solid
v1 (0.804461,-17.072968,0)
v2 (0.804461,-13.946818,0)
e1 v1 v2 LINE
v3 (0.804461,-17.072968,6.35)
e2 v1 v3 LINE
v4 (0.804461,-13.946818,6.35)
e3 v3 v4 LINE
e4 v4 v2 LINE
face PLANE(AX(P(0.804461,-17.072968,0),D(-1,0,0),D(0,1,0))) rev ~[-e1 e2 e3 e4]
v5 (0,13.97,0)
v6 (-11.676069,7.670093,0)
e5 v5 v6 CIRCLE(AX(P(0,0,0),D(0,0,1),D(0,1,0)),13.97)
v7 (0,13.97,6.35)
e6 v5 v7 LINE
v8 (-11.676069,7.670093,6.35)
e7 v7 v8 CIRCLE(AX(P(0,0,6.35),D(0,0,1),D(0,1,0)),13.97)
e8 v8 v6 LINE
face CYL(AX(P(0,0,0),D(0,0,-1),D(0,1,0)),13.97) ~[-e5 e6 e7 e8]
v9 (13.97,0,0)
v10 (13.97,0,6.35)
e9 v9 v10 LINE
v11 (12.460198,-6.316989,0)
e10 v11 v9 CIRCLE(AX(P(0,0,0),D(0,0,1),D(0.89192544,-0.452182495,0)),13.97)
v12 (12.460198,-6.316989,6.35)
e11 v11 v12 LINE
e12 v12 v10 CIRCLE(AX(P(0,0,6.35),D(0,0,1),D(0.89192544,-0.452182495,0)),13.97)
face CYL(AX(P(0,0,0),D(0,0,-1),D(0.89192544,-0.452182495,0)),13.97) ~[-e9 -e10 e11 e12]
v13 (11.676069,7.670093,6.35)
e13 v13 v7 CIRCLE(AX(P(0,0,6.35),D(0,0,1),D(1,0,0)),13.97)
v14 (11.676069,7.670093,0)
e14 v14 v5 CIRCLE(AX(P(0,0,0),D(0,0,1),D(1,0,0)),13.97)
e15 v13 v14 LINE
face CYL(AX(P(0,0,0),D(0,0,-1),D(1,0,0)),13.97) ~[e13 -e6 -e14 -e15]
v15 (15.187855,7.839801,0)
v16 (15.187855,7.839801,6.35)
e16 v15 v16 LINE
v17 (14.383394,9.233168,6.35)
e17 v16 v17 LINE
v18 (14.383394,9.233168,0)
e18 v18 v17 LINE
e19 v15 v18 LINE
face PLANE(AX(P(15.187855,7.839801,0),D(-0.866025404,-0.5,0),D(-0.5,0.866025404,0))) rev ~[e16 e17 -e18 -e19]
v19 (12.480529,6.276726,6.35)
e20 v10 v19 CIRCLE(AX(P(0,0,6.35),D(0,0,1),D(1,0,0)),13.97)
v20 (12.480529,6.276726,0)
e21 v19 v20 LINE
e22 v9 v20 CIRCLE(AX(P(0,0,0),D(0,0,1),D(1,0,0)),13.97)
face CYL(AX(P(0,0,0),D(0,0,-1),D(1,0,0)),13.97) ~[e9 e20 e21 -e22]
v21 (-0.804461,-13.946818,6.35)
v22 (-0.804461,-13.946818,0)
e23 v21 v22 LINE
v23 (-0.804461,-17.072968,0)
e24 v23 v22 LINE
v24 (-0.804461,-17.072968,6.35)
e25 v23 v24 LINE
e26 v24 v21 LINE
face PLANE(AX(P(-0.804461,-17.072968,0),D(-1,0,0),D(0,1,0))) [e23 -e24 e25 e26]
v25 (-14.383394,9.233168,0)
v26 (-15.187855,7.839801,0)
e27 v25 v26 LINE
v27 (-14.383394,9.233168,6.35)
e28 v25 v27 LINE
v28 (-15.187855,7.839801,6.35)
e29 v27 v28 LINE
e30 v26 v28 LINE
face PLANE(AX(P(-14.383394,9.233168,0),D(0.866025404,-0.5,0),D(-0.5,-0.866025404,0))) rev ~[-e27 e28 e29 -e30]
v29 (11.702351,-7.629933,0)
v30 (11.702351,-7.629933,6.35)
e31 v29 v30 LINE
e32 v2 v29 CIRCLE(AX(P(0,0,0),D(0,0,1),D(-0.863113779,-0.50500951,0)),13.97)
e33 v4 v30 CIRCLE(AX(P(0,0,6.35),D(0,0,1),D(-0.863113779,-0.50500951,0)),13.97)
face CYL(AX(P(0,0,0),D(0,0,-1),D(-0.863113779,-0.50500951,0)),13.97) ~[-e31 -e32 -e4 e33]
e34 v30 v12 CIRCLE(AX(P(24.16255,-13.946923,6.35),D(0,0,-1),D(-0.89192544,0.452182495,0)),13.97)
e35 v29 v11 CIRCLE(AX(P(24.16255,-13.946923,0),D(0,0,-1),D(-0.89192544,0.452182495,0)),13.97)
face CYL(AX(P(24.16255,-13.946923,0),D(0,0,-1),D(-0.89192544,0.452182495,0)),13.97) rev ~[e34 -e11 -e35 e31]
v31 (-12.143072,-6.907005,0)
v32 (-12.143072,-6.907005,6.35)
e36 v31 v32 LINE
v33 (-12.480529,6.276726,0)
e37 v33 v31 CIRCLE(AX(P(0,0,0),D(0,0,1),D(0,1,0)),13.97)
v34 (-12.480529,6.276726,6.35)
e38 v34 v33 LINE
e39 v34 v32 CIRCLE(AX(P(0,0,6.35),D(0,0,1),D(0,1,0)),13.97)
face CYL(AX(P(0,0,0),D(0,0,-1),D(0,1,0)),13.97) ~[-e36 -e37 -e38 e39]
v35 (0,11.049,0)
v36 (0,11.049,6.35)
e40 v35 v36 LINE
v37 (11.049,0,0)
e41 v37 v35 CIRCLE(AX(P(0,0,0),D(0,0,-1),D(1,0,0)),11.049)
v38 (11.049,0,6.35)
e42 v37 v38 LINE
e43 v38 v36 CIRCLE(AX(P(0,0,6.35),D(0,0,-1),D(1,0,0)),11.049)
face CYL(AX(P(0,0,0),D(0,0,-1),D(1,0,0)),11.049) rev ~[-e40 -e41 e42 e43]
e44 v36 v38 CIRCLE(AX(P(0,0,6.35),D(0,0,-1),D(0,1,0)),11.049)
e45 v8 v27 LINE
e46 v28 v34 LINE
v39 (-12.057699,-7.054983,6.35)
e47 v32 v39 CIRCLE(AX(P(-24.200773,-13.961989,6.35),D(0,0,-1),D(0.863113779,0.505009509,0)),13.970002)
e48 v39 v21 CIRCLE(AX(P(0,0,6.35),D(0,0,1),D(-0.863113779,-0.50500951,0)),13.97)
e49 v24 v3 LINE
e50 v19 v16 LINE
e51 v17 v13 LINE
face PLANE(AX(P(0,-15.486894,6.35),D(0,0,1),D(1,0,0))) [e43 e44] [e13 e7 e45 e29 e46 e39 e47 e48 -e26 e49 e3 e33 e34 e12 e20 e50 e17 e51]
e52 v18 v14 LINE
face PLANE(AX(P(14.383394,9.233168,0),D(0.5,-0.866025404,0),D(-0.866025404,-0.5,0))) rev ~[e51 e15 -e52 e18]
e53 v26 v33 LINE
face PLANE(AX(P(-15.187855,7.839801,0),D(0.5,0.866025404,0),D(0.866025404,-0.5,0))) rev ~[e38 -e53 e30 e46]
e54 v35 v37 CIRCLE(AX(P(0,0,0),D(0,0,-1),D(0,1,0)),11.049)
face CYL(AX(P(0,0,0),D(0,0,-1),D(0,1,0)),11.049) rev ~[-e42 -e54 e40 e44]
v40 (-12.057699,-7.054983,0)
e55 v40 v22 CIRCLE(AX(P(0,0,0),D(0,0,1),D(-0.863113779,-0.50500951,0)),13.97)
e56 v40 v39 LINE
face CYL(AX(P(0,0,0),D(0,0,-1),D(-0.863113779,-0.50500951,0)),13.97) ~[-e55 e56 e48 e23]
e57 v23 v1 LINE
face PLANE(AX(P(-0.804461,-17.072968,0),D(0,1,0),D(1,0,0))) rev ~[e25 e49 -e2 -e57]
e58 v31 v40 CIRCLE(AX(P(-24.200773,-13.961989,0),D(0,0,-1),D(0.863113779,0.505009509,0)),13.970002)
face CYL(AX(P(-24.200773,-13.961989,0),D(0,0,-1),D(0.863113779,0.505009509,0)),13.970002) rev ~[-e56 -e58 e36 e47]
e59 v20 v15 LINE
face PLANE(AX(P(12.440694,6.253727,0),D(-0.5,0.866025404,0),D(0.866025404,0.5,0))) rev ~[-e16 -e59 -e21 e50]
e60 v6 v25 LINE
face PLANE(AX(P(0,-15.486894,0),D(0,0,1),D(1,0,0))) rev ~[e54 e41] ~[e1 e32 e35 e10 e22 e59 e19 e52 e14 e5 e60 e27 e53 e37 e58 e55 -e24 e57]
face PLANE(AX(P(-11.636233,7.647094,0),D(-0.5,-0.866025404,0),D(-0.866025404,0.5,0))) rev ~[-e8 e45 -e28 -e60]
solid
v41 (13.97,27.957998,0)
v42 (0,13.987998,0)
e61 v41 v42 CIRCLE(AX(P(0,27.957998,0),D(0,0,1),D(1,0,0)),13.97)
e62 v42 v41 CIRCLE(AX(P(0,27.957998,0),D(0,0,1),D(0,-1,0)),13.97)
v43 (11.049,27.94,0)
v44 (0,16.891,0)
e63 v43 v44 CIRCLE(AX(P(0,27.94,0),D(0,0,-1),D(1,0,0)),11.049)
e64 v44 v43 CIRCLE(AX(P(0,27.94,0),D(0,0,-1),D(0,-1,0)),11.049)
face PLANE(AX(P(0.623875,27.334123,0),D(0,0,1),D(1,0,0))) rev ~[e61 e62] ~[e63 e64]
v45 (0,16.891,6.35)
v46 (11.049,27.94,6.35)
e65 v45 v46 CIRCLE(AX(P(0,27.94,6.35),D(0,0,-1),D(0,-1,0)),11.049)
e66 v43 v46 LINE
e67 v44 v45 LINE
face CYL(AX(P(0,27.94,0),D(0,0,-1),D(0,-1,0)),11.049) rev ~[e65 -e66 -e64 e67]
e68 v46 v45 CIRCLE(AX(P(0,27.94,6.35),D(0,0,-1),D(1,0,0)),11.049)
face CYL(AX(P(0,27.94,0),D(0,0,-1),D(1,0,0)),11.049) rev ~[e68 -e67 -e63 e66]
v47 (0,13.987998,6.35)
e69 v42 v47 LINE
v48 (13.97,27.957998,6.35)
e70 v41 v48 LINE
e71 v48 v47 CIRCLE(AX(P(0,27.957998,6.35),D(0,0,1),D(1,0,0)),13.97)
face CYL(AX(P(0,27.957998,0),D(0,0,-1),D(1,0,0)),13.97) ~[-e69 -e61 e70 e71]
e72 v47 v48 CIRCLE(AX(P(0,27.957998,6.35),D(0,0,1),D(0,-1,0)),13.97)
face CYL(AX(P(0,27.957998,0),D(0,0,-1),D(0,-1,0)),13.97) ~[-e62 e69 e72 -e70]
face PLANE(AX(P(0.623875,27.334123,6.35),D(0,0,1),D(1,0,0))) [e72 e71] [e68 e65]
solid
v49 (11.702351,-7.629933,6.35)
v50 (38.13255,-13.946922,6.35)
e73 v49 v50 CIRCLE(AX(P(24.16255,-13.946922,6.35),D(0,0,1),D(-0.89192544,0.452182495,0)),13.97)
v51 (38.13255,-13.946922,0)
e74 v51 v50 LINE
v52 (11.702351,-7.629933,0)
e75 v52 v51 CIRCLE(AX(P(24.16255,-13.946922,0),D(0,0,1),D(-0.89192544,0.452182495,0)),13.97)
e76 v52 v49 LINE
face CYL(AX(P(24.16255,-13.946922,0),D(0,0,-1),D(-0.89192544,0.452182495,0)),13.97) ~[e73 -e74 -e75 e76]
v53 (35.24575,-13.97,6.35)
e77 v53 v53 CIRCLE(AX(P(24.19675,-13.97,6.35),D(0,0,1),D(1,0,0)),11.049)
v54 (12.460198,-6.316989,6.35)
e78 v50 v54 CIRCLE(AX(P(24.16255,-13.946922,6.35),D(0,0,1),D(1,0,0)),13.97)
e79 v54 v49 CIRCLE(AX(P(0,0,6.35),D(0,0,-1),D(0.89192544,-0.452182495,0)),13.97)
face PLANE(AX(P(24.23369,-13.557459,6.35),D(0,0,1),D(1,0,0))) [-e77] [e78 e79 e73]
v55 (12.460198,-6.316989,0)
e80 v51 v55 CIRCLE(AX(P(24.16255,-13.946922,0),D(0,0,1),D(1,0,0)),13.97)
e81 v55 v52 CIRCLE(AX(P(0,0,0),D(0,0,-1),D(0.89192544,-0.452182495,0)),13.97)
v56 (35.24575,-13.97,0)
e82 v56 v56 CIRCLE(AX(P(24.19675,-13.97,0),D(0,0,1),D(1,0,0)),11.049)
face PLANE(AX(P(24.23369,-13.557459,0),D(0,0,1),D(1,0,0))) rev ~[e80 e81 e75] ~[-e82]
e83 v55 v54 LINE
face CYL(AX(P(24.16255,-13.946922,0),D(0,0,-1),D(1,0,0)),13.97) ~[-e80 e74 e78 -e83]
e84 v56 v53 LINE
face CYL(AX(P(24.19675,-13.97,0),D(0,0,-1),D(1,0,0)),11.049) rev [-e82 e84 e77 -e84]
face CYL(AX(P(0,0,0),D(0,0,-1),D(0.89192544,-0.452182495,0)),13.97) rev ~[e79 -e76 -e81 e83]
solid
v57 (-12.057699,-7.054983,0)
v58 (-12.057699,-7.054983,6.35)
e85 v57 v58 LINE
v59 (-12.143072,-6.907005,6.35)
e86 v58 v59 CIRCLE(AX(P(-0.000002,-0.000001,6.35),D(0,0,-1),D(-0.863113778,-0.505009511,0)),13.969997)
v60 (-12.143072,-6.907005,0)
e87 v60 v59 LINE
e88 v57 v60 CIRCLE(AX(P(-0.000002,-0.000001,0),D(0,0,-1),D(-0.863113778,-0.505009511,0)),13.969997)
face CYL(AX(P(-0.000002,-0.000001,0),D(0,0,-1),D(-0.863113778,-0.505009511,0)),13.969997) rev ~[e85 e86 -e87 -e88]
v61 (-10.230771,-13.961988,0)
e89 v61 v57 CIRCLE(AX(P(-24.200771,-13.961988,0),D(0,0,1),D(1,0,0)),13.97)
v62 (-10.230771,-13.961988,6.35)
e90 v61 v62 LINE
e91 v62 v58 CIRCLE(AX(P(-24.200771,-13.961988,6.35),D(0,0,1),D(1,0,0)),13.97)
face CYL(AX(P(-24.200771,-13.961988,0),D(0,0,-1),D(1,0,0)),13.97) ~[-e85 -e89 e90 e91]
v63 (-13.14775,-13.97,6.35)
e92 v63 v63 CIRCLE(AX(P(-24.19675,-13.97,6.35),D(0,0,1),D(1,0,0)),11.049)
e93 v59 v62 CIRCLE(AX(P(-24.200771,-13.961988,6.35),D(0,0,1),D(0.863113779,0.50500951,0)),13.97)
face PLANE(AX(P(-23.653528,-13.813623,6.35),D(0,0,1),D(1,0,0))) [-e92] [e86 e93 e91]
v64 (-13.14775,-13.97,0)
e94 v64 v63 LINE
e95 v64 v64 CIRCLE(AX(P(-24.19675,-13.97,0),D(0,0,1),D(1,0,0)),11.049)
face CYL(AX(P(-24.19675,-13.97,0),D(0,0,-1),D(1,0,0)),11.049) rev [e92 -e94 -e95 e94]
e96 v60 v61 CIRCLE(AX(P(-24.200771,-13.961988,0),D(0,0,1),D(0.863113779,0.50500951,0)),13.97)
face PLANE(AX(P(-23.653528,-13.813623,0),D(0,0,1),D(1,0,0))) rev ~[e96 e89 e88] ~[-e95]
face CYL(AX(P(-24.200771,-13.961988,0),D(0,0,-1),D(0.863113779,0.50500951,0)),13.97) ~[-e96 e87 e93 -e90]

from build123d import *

# Parameters (mm, degrees)
F2_DEPTH = 6.35
F1_R     = 11.049
F6_W     = 1.6089215642
F6_H     = 3.1721480191
F7_DEPTH = 6.35


# Not quite as in the source:
# - the program builds the solid bodies; features that only make, move or delete a surface that nothing else refers to are left out


with BuildPart() as f2:
    # F1 (on face) → F2 (new body)
    with BuildSketch(Plane.XY):
        with BuildLine():
            ThreePointArc((0, 13.9879982162), (9.8782817332, 18.079716483), (13.97, 27.9579982162))
            ThreePointArc((13.97, 27.9579982162), (-9.8782817332, 37.8362799493), (0, 13.9879982162))
        make_face()
        with BuildLine():
            ThreePointArc((11.049, 27.94), (7.8128228253, 20.1271771747), (0, 16.891))
            ThreePointArc((0, 16.891), (-7.8128228253, 35.7528228253), (11.049, 27.94))
        make_face(mode=Mode.SUBTRACT)
    extrude(amount=F2_DEPTH)


with BuildPart() as f2b:
    # F1 (on face) → F2, piece 2 (new body)
    with BuildSketch(Plane.XY):
        with BuildLine():
            ThreePointArc((13.97, 0), (9.8782817332, 9.8782817332), (0, 13.97))
            ThreePointArc((0, 13.97), (-12.0758386026, 7.0238893815), (-12.1430715152, -6.9070047181))
            ThreePointArc((-12.1430715152, -6.9070047181), (-12.1001592972, -6.9808632821), (-12.0576994887, -7.0549828518))
            ThreePointArc((-12.0576994887, -7.0549828518), (-0.3379497641, -13.9659117123), (11.7023511261, -7.6299330352))
            ThreePointArc((11.7023511261, -7.6299330352), (12.063452241, -6.9631738679), (12.4601983994, -6.3169894607))
            ThreePointArc((12.4601983994, -6.3169894607), (13.5873078945, -3.2474550313), (13.97, 0))
        make_face()
        with BuildLine():
            ThreePointArc((11.049, 0), (-7.8128228253, -7.8128228253), (0, 11.049))
            ThreePointArc((0, 11.049), (7.8128228253, 7.8128228253), (11.049, 0))
        make_face(mode=Mode.SUBTRACT)
    extrude(amount=F2_DEPTH)

    # F6 (on Top) → F7 (join)
    with BuildSketch(Plane.XY):
        with Locations((0, -15.4868941754)):
            Rectangle(F6_W, F6_H)
        Polygon((14.3833937751, 9.2331675661), (11.636233006, 7.6470935566), (12.4406937881, 6.2537266093), (15.1878545572, 7.8398006188), align=None)
        Polygon((-15.1878545572, 7.8398006188), (-12.4406937881, 6.2537266093), (-11.636233006, 7.6470935566), (-14.3833937751, 9.2331675661), align=None)
    extrude(amount=F7_DEPTH)


with BuildPart() as f2c:
    # F1 (on face) → F2, piece 3 (new body)
    with BuildSketch(Plane.XY):
        with BuildLine():
            ThreePointArc((-12.0576994887, -7.0549828518), (-12.1006117068, -6.9811242878), (-12.1430715152, -6.9070047181))
            ThreePointArc((-12.1430715152, -6.9070047181), (-37.6842231186, -17.616767874), (-10.230771004, -13.9619875699))
            ThreePointArc((-10.230771004, -13.9619875699), (-10.6952238276, -10.3897200175), (-12.0576994887, -7.0549828518))
        make_face()
        with Locations((-24.1967497817, -13.97)):
            Circle(F1_R, mode=Mode.SUBTRACT)
    extrude(amount=F2_DEPTH)


with BuildPart() as f2d:
    # F1 (on face) → F2, piece 4 (new body)
    with BuildSketch(Plane.XY):
        with BuildLine():
            ThreePointArc((38.1325495255, -13.946922496), (28.1424398989, -0.5558294631), (12.4601983994, -6.3169894607))
            ThreePointArc((12.4601983994, -6.3169894607), (12.0990972845, -6.983748628), (11.7023511261, -7.6299330352))
            ThreePointArc((11.7023511261, -7.6299330352), (20.9150944942, -27.5342303905), (38.1325495255, -13.946922496))
        make_face()
        with Locations((24.1967497817, -13.97)):
            Circle(F1_R, mode=Mode.SUBTRACT)
    extrude(amount=F2_DEPTH)


solid = Compound([f2.part, f2b.part, f2c.part, f2d.part])
